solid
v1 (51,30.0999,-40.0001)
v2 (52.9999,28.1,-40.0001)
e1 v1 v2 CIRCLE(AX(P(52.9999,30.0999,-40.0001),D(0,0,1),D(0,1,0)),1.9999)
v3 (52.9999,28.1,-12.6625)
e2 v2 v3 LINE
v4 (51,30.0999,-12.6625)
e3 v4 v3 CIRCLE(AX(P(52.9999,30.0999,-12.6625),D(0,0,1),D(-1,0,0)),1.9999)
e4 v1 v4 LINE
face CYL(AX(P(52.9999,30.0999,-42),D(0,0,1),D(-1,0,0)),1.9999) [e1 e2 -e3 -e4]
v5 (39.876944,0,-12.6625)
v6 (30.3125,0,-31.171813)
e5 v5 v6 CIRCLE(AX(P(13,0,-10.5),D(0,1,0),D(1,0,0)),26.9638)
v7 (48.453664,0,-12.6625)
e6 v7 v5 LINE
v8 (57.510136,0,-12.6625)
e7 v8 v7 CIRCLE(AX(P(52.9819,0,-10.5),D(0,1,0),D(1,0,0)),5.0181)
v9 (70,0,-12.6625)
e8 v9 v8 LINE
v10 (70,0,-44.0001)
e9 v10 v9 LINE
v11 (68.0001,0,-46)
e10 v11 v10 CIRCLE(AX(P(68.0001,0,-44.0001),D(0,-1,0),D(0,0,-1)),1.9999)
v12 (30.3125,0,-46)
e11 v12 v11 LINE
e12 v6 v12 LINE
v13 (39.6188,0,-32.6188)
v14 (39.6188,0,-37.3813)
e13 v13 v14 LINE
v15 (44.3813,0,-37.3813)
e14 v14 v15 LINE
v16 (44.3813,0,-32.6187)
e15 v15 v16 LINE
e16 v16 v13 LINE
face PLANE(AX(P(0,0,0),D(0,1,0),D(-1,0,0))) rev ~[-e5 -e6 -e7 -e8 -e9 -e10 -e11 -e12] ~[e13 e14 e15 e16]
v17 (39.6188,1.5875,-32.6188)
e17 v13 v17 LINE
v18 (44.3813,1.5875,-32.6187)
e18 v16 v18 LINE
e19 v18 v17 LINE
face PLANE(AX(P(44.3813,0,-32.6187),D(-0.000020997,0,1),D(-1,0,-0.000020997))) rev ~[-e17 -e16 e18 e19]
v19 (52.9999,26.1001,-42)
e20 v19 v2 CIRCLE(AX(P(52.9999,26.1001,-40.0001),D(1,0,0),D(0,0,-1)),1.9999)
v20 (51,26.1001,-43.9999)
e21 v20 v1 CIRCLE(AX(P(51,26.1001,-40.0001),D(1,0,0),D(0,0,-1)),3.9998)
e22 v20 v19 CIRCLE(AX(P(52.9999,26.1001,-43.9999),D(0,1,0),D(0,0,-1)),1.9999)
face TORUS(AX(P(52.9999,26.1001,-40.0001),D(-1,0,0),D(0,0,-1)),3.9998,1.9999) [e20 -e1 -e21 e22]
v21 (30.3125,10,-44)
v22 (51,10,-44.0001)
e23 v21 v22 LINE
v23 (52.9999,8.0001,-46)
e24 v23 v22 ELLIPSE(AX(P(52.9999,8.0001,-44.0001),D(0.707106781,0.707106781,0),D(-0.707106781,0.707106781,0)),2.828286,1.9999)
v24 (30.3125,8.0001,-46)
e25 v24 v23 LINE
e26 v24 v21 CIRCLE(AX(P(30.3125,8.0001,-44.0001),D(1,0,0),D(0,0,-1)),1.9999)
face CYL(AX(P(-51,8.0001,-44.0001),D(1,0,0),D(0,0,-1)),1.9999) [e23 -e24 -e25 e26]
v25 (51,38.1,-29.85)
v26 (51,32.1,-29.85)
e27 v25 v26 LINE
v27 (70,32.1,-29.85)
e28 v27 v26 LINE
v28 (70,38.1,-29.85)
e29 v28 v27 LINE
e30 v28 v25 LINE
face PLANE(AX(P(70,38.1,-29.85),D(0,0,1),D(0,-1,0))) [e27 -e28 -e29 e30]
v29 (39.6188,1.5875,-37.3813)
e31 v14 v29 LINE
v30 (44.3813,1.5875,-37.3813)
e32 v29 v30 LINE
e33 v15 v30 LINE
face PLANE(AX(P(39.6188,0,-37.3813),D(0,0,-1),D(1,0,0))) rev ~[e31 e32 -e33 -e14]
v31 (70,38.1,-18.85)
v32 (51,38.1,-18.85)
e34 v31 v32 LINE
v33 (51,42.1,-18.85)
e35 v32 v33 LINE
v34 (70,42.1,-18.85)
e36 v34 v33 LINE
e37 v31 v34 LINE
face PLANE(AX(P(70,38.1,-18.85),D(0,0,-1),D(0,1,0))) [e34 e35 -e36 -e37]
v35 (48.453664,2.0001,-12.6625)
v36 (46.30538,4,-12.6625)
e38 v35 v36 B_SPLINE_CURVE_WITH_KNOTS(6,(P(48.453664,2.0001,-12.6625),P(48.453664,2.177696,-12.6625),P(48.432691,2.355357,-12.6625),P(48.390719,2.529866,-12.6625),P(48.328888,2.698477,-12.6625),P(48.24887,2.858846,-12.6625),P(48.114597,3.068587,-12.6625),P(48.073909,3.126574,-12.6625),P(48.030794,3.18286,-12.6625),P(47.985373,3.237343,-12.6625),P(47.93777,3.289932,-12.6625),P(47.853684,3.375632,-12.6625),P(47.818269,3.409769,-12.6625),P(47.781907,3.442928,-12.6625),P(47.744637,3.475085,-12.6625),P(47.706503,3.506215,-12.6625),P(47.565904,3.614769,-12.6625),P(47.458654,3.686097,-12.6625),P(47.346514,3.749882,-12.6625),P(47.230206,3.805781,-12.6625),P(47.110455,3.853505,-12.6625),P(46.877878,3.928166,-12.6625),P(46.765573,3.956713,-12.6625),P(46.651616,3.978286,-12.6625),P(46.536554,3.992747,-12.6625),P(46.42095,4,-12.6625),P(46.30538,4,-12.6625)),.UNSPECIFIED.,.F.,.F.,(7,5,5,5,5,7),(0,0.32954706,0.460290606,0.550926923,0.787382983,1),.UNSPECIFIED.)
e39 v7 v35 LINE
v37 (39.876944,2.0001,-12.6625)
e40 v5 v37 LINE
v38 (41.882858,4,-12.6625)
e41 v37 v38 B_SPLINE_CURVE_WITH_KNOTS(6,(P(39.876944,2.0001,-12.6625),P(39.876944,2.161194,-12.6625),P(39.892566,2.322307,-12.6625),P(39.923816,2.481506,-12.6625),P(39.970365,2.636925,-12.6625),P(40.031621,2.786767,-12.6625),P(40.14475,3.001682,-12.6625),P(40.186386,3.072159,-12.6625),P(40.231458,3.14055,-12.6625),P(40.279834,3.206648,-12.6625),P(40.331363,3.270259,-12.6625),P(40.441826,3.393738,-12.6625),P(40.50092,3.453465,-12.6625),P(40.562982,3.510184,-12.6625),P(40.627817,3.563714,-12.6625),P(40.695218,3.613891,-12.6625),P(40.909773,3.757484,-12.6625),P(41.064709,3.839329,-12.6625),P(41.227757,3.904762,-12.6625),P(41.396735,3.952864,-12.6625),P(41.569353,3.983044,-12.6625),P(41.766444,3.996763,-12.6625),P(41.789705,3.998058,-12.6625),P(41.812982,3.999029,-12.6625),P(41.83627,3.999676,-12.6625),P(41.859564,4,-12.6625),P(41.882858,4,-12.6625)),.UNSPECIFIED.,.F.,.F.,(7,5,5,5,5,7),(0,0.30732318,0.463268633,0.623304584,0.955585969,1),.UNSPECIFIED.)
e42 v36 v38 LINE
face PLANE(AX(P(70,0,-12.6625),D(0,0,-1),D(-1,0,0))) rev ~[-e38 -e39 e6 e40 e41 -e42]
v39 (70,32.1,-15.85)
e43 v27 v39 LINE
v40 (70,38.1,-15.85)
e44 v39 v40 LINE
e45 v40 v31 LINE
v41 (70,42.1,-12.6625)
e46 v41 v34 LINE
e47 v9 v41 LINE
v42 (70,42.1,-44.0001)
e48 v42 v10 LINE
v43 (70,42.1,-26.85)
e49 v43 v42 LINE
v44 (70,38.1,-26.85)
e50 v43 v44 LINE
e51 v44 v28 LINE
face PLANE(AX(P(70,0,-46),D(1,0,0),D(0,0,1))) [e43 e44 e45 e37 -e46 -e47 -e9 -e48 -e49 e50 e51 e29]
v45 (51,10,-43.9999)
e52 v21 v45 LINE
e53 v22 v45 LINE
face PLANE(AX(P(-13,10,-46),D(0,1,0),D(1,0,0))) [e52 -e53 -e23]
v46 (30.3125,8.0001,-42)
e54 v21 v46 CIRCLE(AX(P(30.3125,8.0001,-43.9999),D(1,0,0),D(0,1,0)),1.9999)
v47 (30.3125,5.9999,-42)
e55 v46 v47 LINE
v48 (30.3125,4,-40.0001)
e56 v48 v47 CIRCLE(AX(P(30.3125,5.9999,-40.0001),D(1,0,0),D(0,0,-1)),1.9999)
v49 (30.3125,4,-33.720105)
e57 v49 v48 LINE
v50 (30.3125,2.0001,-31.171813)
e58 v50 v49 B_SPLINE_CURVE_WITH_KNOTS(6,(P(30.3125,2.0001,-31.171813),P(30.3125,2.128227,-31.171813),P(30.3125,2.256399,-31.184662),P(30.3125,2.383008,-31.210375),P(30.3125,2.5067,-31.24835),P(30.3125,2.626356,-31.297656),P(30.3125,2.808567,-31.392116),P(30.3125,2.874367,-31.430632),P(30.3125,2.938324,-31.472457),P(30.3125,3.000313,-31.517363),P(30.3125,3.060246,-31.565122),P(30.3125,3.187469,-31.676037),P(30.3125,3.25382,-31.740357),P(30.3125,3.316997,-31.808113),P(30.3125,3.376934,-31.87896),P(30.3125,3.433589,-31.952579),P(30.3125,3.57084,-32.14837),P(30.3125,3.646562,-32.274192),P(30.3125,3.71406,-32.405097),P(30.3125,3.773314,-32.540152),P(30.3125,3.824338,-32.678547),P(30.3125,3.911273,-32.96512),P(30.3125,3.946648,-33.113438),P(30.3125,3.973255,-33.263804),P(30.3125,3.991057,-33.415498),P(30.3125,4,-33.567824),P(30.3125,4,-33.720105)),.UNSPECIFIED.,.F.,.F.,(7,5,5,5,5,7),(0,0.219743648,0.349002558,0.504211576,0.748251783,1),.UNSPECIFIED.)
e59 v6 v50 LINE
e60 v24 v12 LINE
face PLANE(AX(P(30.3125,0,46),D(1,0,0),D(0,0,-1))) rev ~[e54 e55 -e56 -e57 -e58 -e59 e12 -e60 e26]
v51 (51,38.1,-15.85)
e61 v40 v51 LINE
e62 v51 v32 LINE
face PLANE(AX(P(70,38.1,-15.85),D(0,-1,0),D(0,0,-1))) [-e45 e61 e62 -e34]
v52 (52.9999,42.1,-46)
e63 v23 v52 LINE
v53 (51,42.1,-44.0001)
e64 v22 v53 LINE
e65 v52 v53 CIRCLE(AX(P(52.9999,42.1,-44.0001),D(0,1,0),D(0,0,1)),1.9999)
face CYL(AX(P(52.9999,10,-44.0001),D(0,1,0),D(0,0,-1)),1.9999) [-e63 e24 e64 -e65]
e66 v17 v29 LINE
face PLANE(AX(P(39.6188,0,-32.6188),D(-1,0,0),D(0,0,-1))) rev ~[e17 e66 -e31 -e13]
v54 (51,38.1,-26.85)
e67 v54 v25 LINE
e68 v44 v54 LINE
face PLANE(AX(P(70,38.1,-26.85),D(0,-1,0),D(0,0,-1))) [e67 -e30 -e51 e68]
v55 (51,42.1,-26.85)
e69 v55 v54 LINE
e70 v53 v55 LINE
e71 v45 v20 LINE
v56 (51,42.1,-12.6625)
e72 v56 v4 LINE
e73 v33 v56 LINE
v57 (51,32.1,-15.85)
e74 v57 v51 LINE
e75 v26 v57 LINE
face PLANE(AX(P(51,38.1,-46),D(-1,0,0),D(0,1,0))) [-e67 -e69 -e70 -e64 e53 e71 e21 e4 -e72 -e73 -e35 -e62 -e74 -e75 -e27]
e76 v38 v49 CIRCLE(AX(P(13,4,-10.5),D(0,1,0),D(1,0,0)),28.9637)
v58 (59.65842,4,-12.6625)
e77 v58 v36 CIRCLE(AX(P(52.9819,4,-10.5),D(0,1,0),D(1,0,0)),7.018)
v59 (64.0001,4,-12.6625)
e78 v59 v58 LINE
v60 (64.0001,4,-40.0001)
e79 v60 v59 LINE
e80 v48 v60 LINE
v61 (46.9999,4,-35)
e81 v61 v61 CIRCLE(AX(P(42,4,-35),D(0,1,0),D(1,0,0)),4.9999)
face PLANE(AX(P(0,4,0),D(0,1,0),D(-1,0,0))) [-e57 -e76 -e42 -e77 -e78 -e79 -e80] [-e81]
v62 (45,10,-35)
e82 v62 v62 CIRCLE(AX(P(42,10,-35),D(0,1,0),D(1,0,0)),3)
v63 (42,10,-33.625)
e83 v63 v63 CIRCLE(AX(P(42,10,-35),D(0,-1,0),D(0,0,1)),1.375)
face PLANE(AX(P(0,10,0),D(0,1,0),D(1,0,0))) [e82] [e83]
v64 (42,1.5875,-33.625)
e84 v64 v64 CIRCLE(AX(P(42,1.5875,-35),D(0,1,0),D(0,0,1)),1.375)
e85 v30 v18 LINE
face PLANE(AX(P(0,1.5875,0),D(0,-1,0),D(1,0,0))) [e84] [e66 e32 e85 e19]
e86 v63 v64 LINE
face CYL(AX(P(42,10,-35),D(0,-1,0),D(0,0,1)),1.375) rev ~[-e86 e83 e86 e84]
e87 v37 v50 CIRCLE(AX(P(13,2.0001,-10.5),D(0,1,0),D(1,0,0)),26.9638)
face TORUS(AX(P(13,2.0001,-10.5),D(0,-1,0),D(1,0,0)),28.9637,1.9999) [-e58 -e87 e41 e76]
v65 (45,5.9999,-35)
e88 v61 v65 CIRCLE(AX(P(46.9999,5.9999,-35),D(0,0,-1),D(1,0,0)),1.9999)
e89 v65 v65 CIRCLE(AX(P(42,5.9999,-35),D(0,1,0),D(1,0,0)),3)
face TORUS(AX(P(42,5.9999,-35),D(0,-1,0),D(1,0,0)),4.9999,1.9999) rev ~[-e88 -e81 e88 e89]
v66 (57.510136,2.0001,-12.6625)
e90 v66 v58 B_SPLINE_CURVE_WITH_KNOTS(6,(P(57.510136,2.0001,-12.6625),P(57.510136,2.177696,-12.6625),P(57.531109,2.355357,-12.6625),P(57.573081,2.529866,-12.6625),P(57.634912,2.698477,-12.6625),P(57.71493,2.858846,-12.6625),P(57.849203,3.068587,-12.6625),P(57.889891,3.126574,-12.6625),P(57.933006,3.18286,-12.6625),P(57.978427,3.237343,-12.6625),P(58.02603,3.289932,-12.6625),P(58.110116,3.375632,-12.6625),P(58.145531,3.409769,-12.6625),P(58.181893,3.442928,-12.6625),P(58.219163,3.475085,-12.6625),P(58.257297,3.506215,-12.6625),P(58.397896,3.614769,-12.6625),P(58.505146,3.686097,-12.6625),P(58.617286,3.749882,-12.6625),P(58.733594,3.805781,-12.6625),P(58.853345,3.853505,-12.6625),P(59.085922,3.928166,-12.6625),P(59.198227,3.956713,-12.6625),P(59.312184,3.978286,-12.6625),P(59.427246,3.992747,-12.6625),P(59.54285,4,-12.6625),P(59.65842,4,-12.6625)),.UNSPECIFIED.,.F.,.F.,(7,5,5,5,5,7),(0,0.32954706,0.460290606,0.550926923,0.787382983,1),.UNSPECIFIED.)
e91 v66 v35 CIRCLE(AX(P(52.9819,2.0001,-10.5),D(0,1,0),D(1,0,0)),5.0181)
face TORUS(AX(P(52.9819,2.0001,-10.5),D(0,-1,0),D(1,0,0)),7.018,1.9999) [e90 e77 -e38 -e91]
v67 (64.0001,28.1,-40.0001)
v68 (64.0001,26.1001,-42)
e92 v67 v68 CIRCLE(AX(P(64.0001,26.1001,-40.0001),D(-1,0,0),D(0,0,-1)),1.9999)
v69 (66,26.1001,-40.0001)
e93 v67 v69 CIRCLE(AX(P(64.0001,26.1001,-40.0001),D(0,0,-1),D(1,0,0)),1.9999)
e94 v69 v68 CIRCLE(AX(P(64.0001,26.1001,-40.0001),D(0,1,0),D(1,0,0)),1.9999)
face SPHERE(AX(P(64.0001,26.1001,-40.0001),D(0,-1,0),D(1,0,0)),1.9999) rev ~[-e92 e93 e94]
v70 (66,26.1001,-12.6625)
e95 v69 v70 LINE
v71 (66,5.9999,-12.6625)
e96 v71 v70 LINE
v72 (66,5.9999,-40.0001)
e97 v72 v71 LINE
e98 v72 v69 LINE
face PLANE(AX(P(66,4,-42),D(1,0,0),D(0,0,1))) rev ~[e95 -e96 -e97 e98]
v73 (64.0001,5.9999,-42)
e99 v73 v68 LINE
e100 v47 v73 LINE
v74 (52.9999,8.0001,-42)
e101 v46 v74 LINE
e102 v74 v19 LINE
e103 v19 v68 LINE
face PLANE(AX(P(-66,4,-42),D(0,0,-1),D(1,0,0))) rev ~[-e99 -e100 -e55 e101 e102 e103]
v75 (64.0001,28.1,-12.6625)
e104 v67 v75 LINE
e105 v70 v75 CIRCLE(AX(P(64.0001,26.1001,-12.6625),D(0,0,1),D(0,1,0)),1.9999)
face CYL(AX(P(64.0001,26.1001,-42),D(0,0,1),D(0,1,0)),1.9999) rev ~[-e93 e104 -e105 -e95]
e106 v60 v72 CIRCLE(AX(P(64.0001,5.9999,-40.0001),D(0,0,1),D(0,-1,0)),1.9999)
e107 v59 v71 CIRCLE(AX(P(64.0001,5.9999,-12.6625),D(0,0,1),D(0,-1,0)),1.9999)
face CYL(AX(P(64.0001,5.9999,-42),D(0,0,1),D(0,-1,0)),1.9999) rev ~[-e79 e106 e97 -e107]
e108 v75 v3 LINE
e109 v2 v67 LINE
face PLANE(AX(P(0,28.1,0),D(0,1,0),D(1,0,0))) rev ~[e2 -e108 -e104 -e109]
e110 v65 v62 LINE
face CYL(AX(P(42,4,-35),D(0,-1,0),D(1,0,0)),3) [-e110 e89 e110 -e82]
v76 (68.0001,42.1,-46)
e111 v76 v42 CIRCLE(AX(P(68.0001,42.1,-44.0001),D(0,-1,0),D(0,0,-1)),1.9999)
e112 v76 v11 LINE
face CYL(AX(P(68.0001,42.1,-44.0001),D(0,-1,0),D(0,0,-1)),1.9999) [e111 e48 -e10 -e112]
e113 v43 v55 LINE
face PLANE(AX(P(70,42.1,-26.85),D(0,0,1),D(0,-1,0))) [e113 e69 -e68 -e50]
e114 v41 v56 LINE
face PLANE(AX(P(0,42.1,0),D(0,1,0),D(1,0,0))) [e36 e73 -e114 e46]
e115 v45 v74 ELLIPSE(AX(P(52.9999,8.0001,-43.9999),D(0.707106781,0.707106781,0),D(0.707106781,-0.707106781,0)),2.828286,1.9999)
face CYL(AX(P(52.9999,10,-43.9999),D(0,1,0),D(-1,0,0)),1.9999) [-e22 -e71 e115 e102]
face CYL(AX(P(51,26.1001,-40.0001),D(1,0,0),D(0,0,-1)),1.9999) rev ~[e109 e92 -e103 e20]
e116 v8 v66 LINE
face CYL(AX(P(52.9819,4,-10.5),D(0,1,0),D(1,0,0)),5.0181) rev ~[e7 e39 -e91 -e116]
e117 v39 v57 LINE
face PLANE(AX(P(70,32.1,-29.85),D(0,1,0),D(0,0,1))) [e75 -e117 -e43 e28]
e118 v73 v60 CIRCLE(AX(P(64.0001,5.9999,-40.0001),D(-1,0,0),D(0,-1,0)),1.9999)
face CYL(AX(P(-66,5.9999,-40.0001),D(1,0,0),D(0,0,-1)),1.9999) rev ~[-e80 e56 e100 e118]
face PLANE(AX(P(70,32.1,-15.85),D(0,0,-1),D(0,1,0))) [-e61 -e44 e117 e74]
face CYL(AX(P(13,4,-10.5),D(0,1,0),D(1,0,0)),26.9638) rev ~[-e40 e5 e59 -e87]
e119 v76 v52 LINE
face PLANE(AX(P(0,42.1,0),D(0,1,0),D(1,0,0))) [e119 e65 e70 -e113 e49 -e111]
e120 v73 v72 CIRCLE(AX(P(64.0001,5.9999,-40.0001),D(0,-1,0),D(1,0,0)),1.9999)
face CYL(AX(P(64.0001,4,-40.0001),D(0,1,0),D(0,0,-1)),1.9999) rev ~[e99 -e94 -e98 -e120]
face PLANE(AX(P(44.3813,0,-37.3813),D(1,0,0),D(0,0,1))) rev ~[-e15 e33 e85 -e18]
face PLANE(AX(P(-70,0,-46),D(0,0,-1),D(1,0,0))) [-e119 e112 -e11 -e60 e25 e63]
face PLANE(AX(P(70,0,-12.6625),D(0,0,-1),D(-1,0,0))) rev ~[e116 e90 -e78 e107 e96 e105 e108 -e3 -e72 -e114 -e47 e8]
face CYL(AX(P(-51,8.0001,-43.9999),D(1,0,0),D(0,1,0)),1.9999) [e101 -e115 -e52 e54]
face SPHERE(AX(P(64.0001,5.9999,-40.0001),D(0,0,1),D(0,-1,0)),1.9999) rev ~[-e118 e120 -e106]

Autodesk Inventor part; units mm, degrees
ref_plane "YZ Plane" through (0, 0, 0) normal (1, 0, 0) x (0, 1, 0)
ref_plane "XZ Plane" through (0, 0, 0) normal (0, 1, 0) x (-1, 0, 0)
ref_plane "XY Plane" through (0, 0, 0) normal (0, 0, 1) x (1, 0, 0)
sketch "Sketch1" plane through (0, 0, 0) normal (0, 1, 0) x (-1, 0, 0)
  line L0 (70, -46) -> (-70, -46)
  line L1 (-70, -46) -> (-70, 46)
  line L2 (-70, 46) -> (70, 46)
  line L3 (70, 46) -> (70, -46)
  point P0 (0, 0)
  point P1 (0, -46)
  point P2 (-70, 0)
  dimension "d0" = 140
  dimension "d1" = 92
extrude "Extrusion1" add sketch "Sketch1" along normal blind 4
sketch "Sketch2" plane through (0, 4, 0) normal (0, 1, 0) x (1, 0, 0)
  line L0 (70, 46) -> (-70, 46) projected
  line L1 (-70, 46) -> (-70, -46) projected
  line L2 (-70, -46) -> (70, -46) projected
  line L3 (70, -46) -> (70, 46) projected
  line L4 (-70, 46) -> (70, 46)
  line L5 (70, 46) -> (70, -46)
  line L6 (70, -46) -> (-70, -46)
  line L7 (-70, -46) -> (-70, 46)
  line L8 (-66, 42) -> (66, 42)
  line L9 (66, 42) -> (66, -42)
  line L10 (66, -42) -> (-66, -42)
  line L11 (-66, -42) -> (-66, 42)
  point P0 (0, 0)
  point P1 (0, -42)
  dimension "d4" = 4
  dimension "d5" = 4
  dimension "d6" = 4
  dimension "d7" = 4
extrude "Extrusion3" add sketch "Sketch2" along normal blind 38.1
sketch "Sketch3" plane through (0, 42.1, 0) normal (0, 1, 0) x (1, 0, 0)
  line L0 (66, 42) -> (66, -42) projected
  line L1 (66, -42) -> (-66, -42) projected
  line L2 (-66, -42) -> (-66, 42) projected
  line L3 (-66, 42) -> (66, 42) projected
  line L4 (70, 46) -> (-70, 46) projected
  line L5 (-70, 46) -> (-70, -46) projected
  line L6 (-70, -46) -> (70, -46) projected
  line L7 (70, -46) -> (70, 46) projected
  line L8 (-66, 42) -> (-66, -42) projected
  line L9 (-66, -42) -> (66, -42) projected
  line L10 (-66, 42) -> (-51, 42)
  line L11 (-51, 42) -> (-51, -42)
  line L12 (-51, -42) -> (-66, -42)
  line L13 (-66, -42) -> (-66, 42)
  line L14 (66, 42) -> (51, 42)
  line L15 (51, 42) -> (51, -42)
  line L16 (51, -42) -> (66, -42)
  line L17 (66, -42) -> (66, 42)
  point P0 (0, 0)
  dimension "d17" = 19
  dimension "d60" = 19
extrude "Extrusion4" add sketch "Sketch3" against normal blind 14 contours L0 L1 L15 L3 | L11 L1 L2 L3
sketch "Sketch5" plane through (70, 0, 46) normal (1, 0, 0) x (0, 0, -1)
  line L0 (92, 0) -> (0, 0) projected
  line L1 (92, 0) -> (92, 42.1) projected
  line L2 (0, 42.1) -> (92, 42.1) projected
  line L3 (0, 0) -> (0, 42.1) projected
  line L4 (92, 42.1) -> (0, 42.1) projected
  line L5 (19.15, 42.1) -> (27.15, 42.1)
  line L6 (27.15, 38.1) -> (30.15, 38.1)
  line L7 (30.15, 38.1) -> (30.15, 32.1)
  line L8 (30.15, 32.1) -> (16.15, 32.1)
  line L9 (16.15, 32.1) -> (16.15, 38.1)
  line L10 (16.15, 38.1) -> (19.15, 38.1)
  line L11 (19.15, 38.1) -> (19.15, 42.1)
  line L12 (27.15, 42.1) -> (27.15, 38.1)
  line L13 (64.85, 42.1) -> (72.85, 42.1)
  line L14 (72.85, 38.1) -> (75.85, 38.1)
  line L15 (75.85, 38.1) -> (75.85, 32.1)
  line L16 (75.85, 32.1) -> (61.85, 32.1)
  line L17 (61.85, 32.1) -> (61.85, 38.1)
  line L18 (61.85, 38.1) -> (64.85, 38.1)
  line L19 (64.85, 38.1) -> (64.85, 42.1)
  line L20 (72.85, 42.1) -> (72.85, 38.1)
  line L21 (0, 42.1) -> (92, 42.1) projected
  point P0 (46, 0)
  point P1 (23.15, 42.1)
  point P2 (23.15, 32.1)
  point P3 (68.85, 42.1)
  point P4 (68.85, 32.1)
  dimension "d47" = 14
  dimension "d48" = 6
  dimension "d49" = 8
  dimension "d50" = 10
  dimension "d51" = 23.15
  dimension "d52" = 14
  dimension "d53" = 6
  dimension "d54" = 8
  dimension "d56" = 10
  dimension "d57" = 23.15
extrude "Extrusion7" cut sketch "Sketch5" against normal blind 19 contours L20 L14 L15 L16 L17 L18 L19 L2 | L2 L12 L6 L7 L8 L9 L10 L11
sketch "Sketch6" plane through (-70, 0, -46) normal (-1, 0, 0) x (0, 0, 1)
  line L0 (92, 0) -> (0, 0) projected
  line L1 (92, 0) -> (92, 42.1) projected
  line L2 (0, 42.1) -> (92, 42.1) projected
  line L3 (0, 0) -> (0, 42.1) projected
  line L4 (64.85, 42.1) -> (72.85, 42.1)
  line L5 (72.85, 38.1) -> (75.85, 38.1)
  line L6 (75.85, 38.1) -> (75.85, 32.1)
  line L7 (75.85, 32.1) -> (61.85, 32.1)
  line L8 (61.85, 32.1) -> (61.85, 38.1)
  line L9 (61.85, 38.1) -> (64.85, 38.1)
  line L10 (64.85, 38.1) -> (64.85, 42.1)
  line L11 (72.85, 42.1) -> (72.85, 38.1)
  line L12 (19.15, 42.1) -> (27.15, 42.1)
  line L13 (27.15, 38.1) -> (30.15, 38.1)
  line L14 (30.15, 38.1) -> (30.15, 32.1)
  line L15 (30.15, 32.1) -> (16.15, 32.1)
  line L16 (16.15, 32.1) -> (16.15, 38.1)
  line L17 (16.15, 38.1) -> (19.15, 38.1)
  line L18 (19.15, 38.1) -> (19.15, 42.1)
  line L19 (27.15, 42.1) -> (27.15, 38.1)
  line L20 (0, 42.1) -> (92, 42.1) projected
  point P0 (46, 0)
  point P1 (68.85, 42.1)
  point P2 (68.85, 32.1)
  point P3 (23.15, 42.1)
  point P4 (23.15, 32.1)
  dimension "d61" = 14
  dimension "d62" = 6
  dimension "d63" = 8
  dimension "d65" = 14
  dimension "d66" = 6
  dimension "d67" = 8
  dimension "d69" = 10
  dimension "d70" = 23.15
  dimension "d71" = 23.15
  dimension "d72" = 10
extrude "Extrusion8" cut sketch "Sketch6" against normal blind 19 contours L11 L5 L6 L7 L8 L9 L10 L2 | L2 L19 L13 L14 L15 L16 L17 L18
sketch "Sketch7" plane through (0, 4, 0) normal (0, 1, 0) x (1, 0, 0)
  line L0 (66, -42) -> (66, 42) projected
  line L1 (66, 42) -> (-66, 42) projected
  line L2 (-66, 42) -> (-66, -42) projected
  line L3 (-66, -42) -> (66, -42) projected
  circle A0 centre (-16, 35) radius 3
  circle A1 centre (-16, -14) radius 3
  circle A2 centre (42, 35) radius 3
  circle A3 centre (42, -14) radius 3
  line L4 (-70, 26.85) -> (-51, 26.85) projected
  line L5 (-51, 26.85) -> (-51, 42) projected
  line L6 (-51, 42) -> (51, 42) projected
  line L7 (51, 42) -> (51, 26.85) projected
  line L8 (51, 26.85) -> (70, 26.85) projected
  line L9 (70, 26.85) -> (70, 46) projected
  line L10 (70, 46) -> (-70, 46) projected
  line L11 (-70, 46) -> (-70, 26.85) projected
  point P0 (0, 0)
  dimension "d75" = 6
  dimension "d76" = 6
  dimension "d77" = 49
  dimension "d78" = 58
  dimension "d79" = 6
  dimension "d80" = 6
  dimension "d82" = 7
  dimension "d92" = 35
extrude "Extrusion9" add sketch "Sketch7" along normal blind 6 contours A0 | A1 | A2 | A3
sketch "Sketch8" plane through (-16, 10, -35) normal (0, 1, 0) x (1, 0, 0)
  circle A0 centre (0, 0) radius 3 projected
  circle A1 centre (0, -49) radius 3 projected
  circle A2 centre (58, 0) radius 3 projected
  circle A3 centre (58, -49) radius 3 projected
  circle A4 centre (58, -49) radius 3 projected
  circle A5 centre (0, 0) radius 3 projected
  point P0 (16, -35)
hole "Hole1" at (-16, 10, -35) at (-16, 10, 14) at (42, 10, -35) at (42, 10, 14) direction (0, -1, 0) diameter 2.75 end through all
sketch "Sketch9" plane through (70, 0, -46) normal (0, 0, -1) x (-1, 0, 0)
  line L0 (19, 38.1) -> (19, 42.1) projected
  line L1 (19, 42.1) -> (19, 38.1) projected
  line L2 (19, 38.1) -> (19, 32.1) projected
  line L3 (19, 32.1) -> (19, 38.1) projected
  line L4 (19, 38.1) -> (19, 42.1) projected
  line L5 (19, 28.1) -> (19, 42.1) projected
  line L6 (19, 42.1) -> (19, 28.1) projected
  line L7 (19, 42.1) -> (19, 38.1) projected
  line L8 (19, 38.1) -> (19, 32.1) projected
  line L9 (19, 32.1) -> (19, 38.1) projected
  line L10 (121, 42.1) -> (121, 38.1) projected
  line L11 (121, 38.1) -> (121, 32.1) projected
  line L12 (121, 32.1) -> (121, 38.1) projected
  line L13 (121, 38.1) -> (121, 42.1) projected
  line L14 (121, 28.1) -> (121, 42.1) projected
  line L15 (121, 42.1) -> (121, 28.1) projected
  line L16 (121, 42.1) -> (121, 38.1) projected
  line L17 (121, 38.1) -> (121, 32.1) projected
  line L18 (121, 32.1) -> (121, 38.1) projected
  line L19 (121, 38.1) -> (121, 42.1) projected
  line L20 (19, 42.1) -> (121, 42.1)
  line L21 (121, 42.1) -> (121, 10)
  line L22 (121, 10) -> (19, 10)
  line L23 (19, 10) -> (19, 42.1)
  line L24 (89, 10) -> (83, 10) projected
  point P0 (70, 0)
extrude "Extrusion10" cut sketch "Sketch9" against normal up to surface (4 mm away)
sketch "Sketch10" plane through (0, 0, 0) normal (0, -1, 0) x (1, 0, 0)
  line L0 (44.3813, -32.6187) -> (39.6188, -32.6188)
  line L1 (39.6188, -32.6188) -> (39.6188, -37.3813)
  line L2 (39.6188, -37.3813) -> (44.3813, -37.3813)
  line L3 (44.3813, -37.3813) -> (44.3813, -32.6187)
  circle A0 centre (42, -35) radius 1.375 projected
  circle A1 centre (42, -35) radius 1.375 projected
  circle A2 centre (-16, -35) radius 1.375 projected
  circle A3 centre (-16, 14) radius 1.375 projected
  circle A4 centre (42, 14) radius 1.375 projected
  line L4 (-70, -46) -> (70, -46) projected
  line L5 (70, -46) -> (70, 46) projected
  line L6 (70, 46) -> (-70, 46) projected
  line L7 (-70, 46) -> (-70, -46) projected
  line L8 (-13.6187, -37.3812) -> (-18.3812, -37.3812)
  line L9 (-18.3812, -37.3812) -> (-18.3812, -32.6187)
  line L10 (-18.3812, -32.6187) -> (-13.6187, -32.6188)
  line L11 (-13.6187, -32.6188) -> (-13.6187, -37.3812)
  line L12 (44.3813, 11.6188) -> (39.6188, 11.6188)
  line L13 (39.6188, 11.6188) -> (39.6188, 16.3813)
  line L14 (39.6188, 16.3813) -> (44.3813, 16.3813)
  line L15 (44.3813, 16.3813) -> (44.3813, 11.6188)
  line L16 (-13.6187, 11.6188) -> (-18.3812, 11.6188)
  line L17 (-18.3812, 11.6188) -> (-18.3812, 16.3813)
  line L18 (-18.3812, 16.3813) -> (-13.6187, 16.3813)
  line L19 (-13.6187, 16.3813) -> (-13.6187, 11.6188)
  point P0 (0, 0)
  point P1 (42, -32.6187)
  point P2 (39.6188, -35)
  point P3 (-18.3812, -35)
  point P4 (-18.3812, 14)
  point P5 (39.6188, 14)
  point P6 (-16, -37.3813)
  point P7 (-16, 11.6188)
  point P8 (42, 11.6188)
  dimension "d95" = 4.7625
  dimension "d96" = 4.7625
  dimension "d97" = 4.7625
  dimension "d98" = 4.7625
  dimension "d99" = 4.7625
  dimension "d100" = 4.7625
  dimension "d101" = 4.7625
  dimension "d102" = 4.7625
extrude "Extrusion11" cut sketch "Sketch10" against normal blind 1.5875 contours L3 L2 L1 L0 | L8 L9 L10 L11 | L12 L13 L14 L15 | L16 L17 L18 L19
sketch "Sketch11" plane through (0, 4, 0) normal (0, 1, 0) x (1, 0, 0)
  circle A0 centre (42, 35) radius 3 projected
  circle A1 centre (-16, 35) radius 3 projected
  circle A2 centre (-16, -14) radius 3 projected
  circle A3 centre (42, -14) radius 3 projected
  line L0 (66, -42) -> (66, 42) projected
  line L1 (66, 42) -> (-66, 42) projected
  line L2 (-66, 42) -> (-66, -42) projected
  line L3 (-66, -42) -> (66, -42) projected
  circle A4 centre (30.3953, -27.3279) radius 6.6721
  circle A5 centre (13, 10.5) radius 26.9638
  circle A6 centre (-27.6047, -27.3279) radius 6.6721
  circle A7 centre (-36.1, 10.5) radius 14.1362
  circle A8 centre (-51.3279, -27.3279) radius 6.6721
  circle A9 centre (52.9819, 10.5) radius 5.0181
  circle A10 centre (42, -14) radius 1.375 construction
  circle A11 centre (13, 10.5) radius 37.9638 construction
  circle A12 centre (-36.1, 10.5) radius 31.6901 construction
  point P0 (0, 0)
  point P1 (-66, 0)
  dimension "d105" = 8
  dimension "d106" = 8
  dimension "d107" = 8
  dimension "d108" = 8
  dimension "d109" = 8
  dimension "d110" = 8
  dimension "d112" = 8
  dimension "d113" = 8
  dimension "d114" = 8
  dimension "d115" = 8
  dimension "d116" = 8
extrude "Extrusion12" cut sketch "Sketch11" against normal through all contours A4 | A5 | A6 | A7 | A8 | A9
fillet "Fillet1" radius 2 38 edges at (51, 26.05, -46) (70, 21.05, -46) (0, 10, -46) (0, 10, -42) (-51, 26.05, -46) (-70, 21.05, -46) (-70, 21.05, 46) (66, 16.05, 42) (0, 4, 42) (66, 4, 0) (51, 19.05, -42) (51, 35.1, 42) (47.9638, 4, -10.5) (-13.9638, 4, -10.5) (23.7232, 4, 27.3279) (-51, 35.1, 42) (-51, 19.05, -42) (-66, 4, 0) (-66, 16.05, 42) (-66, 16.05, -42) (0, 4, -42) (-50.2362, 4, -10.5) (-58, 4, 27.3279) (-34.2768, 4, 27.3279) (66, 16.05, -42) (39, 4, 14) (-19, 4, 14) (39, 4, -35) (-19, 4, -35) (70, 21.05, 46) (-51, 28.1, 0) (51, 28.1, 0) (66, 28.1, 0) (-66, 28.1, 0) (-58.5, 28.1, 42) (58.5, 28.1, 42) (58.5, 28.1, -42) (-58.5, 28.1, -42)
ref_plane "Work Plane1" through (70, 0, -12.6625) normal (0, 0, -1) x (-1, 0, 0)
ref_plane "Work Plane2" through (30.3125, 0, 46) normal (1, 0, 0) x (0, 0, -1)
sketch "Sketch12" plane through (70, 0, -12.6625) normal (0, 0, -1) x (-1, 0, 0)
  line L0 (-7.5665, 44.2151) -> (155.3884, 44.2151)
  line L1 (155.3884, 44.2151) -> (155.3884, -4.8886)
  line L2 (155.3884, -4.8886) -> (-7.5665, -4.8886)
  line L3 (-7.5665, -4.8886) -> (-7.5665, 44.2151)
  point P0 (70, 0)
extrude "Extrusion13" cut sketch "Sketch12" against normal through all
sketch "Sketch13" plane through (30.3125, 0, 46) normal (1, 0, 0) x (0, 0, -1)
  line L0 (110.5301, 56.5997) -> (-15.9229, 56.5997)
  line L1 (-15.9229, 56.5997) -> (-15.9229, -18.7941)
  line L2 (-15.9229, -18.7941) -> (110.5301, -18.7941)
  line L3 (110.5301, -18.7941) -> (110.5301, 56.5997)
  point P0 (46, 0)
extrude "Extrusion14" cut sketch "Sketch13" against normal through all
equation "\"d5\" = d4"
equation "\"d6\" = d4"
equation "\"d7\" = d4"
equation "\"d60\" = d17"
equation "\"d56\" = d50"
equation "\"d57\" = d51"
equation "\"d69\" = d72"
equation "\"d71\" = d70"
equation "\"d76\" = d75"
equation "\"d79\" = d75"
equation "\"d80\" = d75"
equation "\"d96\" = d95"
equation "\"d97\" = d95"
equation "\"d98\" = d96"
equation "\"d99\" = d96"
equation "\"d100\" = d96"
equation "\"d101\" = d96"
equation "\"d102\" = d96"
equation "\"d106\" = d105"
equation "\"d107\" = d106"
equation "\"d108\" = d105"
equation "\"d110\" = d108"
equation "\"d112\" = d105"
equation "\"d113\" = d110"
equation "\"d114\" = d112"
equation "\"d115\" = d112"
equation "\"d116\" = d112"
properties part number "controlBox" material "ABS Plastic"
